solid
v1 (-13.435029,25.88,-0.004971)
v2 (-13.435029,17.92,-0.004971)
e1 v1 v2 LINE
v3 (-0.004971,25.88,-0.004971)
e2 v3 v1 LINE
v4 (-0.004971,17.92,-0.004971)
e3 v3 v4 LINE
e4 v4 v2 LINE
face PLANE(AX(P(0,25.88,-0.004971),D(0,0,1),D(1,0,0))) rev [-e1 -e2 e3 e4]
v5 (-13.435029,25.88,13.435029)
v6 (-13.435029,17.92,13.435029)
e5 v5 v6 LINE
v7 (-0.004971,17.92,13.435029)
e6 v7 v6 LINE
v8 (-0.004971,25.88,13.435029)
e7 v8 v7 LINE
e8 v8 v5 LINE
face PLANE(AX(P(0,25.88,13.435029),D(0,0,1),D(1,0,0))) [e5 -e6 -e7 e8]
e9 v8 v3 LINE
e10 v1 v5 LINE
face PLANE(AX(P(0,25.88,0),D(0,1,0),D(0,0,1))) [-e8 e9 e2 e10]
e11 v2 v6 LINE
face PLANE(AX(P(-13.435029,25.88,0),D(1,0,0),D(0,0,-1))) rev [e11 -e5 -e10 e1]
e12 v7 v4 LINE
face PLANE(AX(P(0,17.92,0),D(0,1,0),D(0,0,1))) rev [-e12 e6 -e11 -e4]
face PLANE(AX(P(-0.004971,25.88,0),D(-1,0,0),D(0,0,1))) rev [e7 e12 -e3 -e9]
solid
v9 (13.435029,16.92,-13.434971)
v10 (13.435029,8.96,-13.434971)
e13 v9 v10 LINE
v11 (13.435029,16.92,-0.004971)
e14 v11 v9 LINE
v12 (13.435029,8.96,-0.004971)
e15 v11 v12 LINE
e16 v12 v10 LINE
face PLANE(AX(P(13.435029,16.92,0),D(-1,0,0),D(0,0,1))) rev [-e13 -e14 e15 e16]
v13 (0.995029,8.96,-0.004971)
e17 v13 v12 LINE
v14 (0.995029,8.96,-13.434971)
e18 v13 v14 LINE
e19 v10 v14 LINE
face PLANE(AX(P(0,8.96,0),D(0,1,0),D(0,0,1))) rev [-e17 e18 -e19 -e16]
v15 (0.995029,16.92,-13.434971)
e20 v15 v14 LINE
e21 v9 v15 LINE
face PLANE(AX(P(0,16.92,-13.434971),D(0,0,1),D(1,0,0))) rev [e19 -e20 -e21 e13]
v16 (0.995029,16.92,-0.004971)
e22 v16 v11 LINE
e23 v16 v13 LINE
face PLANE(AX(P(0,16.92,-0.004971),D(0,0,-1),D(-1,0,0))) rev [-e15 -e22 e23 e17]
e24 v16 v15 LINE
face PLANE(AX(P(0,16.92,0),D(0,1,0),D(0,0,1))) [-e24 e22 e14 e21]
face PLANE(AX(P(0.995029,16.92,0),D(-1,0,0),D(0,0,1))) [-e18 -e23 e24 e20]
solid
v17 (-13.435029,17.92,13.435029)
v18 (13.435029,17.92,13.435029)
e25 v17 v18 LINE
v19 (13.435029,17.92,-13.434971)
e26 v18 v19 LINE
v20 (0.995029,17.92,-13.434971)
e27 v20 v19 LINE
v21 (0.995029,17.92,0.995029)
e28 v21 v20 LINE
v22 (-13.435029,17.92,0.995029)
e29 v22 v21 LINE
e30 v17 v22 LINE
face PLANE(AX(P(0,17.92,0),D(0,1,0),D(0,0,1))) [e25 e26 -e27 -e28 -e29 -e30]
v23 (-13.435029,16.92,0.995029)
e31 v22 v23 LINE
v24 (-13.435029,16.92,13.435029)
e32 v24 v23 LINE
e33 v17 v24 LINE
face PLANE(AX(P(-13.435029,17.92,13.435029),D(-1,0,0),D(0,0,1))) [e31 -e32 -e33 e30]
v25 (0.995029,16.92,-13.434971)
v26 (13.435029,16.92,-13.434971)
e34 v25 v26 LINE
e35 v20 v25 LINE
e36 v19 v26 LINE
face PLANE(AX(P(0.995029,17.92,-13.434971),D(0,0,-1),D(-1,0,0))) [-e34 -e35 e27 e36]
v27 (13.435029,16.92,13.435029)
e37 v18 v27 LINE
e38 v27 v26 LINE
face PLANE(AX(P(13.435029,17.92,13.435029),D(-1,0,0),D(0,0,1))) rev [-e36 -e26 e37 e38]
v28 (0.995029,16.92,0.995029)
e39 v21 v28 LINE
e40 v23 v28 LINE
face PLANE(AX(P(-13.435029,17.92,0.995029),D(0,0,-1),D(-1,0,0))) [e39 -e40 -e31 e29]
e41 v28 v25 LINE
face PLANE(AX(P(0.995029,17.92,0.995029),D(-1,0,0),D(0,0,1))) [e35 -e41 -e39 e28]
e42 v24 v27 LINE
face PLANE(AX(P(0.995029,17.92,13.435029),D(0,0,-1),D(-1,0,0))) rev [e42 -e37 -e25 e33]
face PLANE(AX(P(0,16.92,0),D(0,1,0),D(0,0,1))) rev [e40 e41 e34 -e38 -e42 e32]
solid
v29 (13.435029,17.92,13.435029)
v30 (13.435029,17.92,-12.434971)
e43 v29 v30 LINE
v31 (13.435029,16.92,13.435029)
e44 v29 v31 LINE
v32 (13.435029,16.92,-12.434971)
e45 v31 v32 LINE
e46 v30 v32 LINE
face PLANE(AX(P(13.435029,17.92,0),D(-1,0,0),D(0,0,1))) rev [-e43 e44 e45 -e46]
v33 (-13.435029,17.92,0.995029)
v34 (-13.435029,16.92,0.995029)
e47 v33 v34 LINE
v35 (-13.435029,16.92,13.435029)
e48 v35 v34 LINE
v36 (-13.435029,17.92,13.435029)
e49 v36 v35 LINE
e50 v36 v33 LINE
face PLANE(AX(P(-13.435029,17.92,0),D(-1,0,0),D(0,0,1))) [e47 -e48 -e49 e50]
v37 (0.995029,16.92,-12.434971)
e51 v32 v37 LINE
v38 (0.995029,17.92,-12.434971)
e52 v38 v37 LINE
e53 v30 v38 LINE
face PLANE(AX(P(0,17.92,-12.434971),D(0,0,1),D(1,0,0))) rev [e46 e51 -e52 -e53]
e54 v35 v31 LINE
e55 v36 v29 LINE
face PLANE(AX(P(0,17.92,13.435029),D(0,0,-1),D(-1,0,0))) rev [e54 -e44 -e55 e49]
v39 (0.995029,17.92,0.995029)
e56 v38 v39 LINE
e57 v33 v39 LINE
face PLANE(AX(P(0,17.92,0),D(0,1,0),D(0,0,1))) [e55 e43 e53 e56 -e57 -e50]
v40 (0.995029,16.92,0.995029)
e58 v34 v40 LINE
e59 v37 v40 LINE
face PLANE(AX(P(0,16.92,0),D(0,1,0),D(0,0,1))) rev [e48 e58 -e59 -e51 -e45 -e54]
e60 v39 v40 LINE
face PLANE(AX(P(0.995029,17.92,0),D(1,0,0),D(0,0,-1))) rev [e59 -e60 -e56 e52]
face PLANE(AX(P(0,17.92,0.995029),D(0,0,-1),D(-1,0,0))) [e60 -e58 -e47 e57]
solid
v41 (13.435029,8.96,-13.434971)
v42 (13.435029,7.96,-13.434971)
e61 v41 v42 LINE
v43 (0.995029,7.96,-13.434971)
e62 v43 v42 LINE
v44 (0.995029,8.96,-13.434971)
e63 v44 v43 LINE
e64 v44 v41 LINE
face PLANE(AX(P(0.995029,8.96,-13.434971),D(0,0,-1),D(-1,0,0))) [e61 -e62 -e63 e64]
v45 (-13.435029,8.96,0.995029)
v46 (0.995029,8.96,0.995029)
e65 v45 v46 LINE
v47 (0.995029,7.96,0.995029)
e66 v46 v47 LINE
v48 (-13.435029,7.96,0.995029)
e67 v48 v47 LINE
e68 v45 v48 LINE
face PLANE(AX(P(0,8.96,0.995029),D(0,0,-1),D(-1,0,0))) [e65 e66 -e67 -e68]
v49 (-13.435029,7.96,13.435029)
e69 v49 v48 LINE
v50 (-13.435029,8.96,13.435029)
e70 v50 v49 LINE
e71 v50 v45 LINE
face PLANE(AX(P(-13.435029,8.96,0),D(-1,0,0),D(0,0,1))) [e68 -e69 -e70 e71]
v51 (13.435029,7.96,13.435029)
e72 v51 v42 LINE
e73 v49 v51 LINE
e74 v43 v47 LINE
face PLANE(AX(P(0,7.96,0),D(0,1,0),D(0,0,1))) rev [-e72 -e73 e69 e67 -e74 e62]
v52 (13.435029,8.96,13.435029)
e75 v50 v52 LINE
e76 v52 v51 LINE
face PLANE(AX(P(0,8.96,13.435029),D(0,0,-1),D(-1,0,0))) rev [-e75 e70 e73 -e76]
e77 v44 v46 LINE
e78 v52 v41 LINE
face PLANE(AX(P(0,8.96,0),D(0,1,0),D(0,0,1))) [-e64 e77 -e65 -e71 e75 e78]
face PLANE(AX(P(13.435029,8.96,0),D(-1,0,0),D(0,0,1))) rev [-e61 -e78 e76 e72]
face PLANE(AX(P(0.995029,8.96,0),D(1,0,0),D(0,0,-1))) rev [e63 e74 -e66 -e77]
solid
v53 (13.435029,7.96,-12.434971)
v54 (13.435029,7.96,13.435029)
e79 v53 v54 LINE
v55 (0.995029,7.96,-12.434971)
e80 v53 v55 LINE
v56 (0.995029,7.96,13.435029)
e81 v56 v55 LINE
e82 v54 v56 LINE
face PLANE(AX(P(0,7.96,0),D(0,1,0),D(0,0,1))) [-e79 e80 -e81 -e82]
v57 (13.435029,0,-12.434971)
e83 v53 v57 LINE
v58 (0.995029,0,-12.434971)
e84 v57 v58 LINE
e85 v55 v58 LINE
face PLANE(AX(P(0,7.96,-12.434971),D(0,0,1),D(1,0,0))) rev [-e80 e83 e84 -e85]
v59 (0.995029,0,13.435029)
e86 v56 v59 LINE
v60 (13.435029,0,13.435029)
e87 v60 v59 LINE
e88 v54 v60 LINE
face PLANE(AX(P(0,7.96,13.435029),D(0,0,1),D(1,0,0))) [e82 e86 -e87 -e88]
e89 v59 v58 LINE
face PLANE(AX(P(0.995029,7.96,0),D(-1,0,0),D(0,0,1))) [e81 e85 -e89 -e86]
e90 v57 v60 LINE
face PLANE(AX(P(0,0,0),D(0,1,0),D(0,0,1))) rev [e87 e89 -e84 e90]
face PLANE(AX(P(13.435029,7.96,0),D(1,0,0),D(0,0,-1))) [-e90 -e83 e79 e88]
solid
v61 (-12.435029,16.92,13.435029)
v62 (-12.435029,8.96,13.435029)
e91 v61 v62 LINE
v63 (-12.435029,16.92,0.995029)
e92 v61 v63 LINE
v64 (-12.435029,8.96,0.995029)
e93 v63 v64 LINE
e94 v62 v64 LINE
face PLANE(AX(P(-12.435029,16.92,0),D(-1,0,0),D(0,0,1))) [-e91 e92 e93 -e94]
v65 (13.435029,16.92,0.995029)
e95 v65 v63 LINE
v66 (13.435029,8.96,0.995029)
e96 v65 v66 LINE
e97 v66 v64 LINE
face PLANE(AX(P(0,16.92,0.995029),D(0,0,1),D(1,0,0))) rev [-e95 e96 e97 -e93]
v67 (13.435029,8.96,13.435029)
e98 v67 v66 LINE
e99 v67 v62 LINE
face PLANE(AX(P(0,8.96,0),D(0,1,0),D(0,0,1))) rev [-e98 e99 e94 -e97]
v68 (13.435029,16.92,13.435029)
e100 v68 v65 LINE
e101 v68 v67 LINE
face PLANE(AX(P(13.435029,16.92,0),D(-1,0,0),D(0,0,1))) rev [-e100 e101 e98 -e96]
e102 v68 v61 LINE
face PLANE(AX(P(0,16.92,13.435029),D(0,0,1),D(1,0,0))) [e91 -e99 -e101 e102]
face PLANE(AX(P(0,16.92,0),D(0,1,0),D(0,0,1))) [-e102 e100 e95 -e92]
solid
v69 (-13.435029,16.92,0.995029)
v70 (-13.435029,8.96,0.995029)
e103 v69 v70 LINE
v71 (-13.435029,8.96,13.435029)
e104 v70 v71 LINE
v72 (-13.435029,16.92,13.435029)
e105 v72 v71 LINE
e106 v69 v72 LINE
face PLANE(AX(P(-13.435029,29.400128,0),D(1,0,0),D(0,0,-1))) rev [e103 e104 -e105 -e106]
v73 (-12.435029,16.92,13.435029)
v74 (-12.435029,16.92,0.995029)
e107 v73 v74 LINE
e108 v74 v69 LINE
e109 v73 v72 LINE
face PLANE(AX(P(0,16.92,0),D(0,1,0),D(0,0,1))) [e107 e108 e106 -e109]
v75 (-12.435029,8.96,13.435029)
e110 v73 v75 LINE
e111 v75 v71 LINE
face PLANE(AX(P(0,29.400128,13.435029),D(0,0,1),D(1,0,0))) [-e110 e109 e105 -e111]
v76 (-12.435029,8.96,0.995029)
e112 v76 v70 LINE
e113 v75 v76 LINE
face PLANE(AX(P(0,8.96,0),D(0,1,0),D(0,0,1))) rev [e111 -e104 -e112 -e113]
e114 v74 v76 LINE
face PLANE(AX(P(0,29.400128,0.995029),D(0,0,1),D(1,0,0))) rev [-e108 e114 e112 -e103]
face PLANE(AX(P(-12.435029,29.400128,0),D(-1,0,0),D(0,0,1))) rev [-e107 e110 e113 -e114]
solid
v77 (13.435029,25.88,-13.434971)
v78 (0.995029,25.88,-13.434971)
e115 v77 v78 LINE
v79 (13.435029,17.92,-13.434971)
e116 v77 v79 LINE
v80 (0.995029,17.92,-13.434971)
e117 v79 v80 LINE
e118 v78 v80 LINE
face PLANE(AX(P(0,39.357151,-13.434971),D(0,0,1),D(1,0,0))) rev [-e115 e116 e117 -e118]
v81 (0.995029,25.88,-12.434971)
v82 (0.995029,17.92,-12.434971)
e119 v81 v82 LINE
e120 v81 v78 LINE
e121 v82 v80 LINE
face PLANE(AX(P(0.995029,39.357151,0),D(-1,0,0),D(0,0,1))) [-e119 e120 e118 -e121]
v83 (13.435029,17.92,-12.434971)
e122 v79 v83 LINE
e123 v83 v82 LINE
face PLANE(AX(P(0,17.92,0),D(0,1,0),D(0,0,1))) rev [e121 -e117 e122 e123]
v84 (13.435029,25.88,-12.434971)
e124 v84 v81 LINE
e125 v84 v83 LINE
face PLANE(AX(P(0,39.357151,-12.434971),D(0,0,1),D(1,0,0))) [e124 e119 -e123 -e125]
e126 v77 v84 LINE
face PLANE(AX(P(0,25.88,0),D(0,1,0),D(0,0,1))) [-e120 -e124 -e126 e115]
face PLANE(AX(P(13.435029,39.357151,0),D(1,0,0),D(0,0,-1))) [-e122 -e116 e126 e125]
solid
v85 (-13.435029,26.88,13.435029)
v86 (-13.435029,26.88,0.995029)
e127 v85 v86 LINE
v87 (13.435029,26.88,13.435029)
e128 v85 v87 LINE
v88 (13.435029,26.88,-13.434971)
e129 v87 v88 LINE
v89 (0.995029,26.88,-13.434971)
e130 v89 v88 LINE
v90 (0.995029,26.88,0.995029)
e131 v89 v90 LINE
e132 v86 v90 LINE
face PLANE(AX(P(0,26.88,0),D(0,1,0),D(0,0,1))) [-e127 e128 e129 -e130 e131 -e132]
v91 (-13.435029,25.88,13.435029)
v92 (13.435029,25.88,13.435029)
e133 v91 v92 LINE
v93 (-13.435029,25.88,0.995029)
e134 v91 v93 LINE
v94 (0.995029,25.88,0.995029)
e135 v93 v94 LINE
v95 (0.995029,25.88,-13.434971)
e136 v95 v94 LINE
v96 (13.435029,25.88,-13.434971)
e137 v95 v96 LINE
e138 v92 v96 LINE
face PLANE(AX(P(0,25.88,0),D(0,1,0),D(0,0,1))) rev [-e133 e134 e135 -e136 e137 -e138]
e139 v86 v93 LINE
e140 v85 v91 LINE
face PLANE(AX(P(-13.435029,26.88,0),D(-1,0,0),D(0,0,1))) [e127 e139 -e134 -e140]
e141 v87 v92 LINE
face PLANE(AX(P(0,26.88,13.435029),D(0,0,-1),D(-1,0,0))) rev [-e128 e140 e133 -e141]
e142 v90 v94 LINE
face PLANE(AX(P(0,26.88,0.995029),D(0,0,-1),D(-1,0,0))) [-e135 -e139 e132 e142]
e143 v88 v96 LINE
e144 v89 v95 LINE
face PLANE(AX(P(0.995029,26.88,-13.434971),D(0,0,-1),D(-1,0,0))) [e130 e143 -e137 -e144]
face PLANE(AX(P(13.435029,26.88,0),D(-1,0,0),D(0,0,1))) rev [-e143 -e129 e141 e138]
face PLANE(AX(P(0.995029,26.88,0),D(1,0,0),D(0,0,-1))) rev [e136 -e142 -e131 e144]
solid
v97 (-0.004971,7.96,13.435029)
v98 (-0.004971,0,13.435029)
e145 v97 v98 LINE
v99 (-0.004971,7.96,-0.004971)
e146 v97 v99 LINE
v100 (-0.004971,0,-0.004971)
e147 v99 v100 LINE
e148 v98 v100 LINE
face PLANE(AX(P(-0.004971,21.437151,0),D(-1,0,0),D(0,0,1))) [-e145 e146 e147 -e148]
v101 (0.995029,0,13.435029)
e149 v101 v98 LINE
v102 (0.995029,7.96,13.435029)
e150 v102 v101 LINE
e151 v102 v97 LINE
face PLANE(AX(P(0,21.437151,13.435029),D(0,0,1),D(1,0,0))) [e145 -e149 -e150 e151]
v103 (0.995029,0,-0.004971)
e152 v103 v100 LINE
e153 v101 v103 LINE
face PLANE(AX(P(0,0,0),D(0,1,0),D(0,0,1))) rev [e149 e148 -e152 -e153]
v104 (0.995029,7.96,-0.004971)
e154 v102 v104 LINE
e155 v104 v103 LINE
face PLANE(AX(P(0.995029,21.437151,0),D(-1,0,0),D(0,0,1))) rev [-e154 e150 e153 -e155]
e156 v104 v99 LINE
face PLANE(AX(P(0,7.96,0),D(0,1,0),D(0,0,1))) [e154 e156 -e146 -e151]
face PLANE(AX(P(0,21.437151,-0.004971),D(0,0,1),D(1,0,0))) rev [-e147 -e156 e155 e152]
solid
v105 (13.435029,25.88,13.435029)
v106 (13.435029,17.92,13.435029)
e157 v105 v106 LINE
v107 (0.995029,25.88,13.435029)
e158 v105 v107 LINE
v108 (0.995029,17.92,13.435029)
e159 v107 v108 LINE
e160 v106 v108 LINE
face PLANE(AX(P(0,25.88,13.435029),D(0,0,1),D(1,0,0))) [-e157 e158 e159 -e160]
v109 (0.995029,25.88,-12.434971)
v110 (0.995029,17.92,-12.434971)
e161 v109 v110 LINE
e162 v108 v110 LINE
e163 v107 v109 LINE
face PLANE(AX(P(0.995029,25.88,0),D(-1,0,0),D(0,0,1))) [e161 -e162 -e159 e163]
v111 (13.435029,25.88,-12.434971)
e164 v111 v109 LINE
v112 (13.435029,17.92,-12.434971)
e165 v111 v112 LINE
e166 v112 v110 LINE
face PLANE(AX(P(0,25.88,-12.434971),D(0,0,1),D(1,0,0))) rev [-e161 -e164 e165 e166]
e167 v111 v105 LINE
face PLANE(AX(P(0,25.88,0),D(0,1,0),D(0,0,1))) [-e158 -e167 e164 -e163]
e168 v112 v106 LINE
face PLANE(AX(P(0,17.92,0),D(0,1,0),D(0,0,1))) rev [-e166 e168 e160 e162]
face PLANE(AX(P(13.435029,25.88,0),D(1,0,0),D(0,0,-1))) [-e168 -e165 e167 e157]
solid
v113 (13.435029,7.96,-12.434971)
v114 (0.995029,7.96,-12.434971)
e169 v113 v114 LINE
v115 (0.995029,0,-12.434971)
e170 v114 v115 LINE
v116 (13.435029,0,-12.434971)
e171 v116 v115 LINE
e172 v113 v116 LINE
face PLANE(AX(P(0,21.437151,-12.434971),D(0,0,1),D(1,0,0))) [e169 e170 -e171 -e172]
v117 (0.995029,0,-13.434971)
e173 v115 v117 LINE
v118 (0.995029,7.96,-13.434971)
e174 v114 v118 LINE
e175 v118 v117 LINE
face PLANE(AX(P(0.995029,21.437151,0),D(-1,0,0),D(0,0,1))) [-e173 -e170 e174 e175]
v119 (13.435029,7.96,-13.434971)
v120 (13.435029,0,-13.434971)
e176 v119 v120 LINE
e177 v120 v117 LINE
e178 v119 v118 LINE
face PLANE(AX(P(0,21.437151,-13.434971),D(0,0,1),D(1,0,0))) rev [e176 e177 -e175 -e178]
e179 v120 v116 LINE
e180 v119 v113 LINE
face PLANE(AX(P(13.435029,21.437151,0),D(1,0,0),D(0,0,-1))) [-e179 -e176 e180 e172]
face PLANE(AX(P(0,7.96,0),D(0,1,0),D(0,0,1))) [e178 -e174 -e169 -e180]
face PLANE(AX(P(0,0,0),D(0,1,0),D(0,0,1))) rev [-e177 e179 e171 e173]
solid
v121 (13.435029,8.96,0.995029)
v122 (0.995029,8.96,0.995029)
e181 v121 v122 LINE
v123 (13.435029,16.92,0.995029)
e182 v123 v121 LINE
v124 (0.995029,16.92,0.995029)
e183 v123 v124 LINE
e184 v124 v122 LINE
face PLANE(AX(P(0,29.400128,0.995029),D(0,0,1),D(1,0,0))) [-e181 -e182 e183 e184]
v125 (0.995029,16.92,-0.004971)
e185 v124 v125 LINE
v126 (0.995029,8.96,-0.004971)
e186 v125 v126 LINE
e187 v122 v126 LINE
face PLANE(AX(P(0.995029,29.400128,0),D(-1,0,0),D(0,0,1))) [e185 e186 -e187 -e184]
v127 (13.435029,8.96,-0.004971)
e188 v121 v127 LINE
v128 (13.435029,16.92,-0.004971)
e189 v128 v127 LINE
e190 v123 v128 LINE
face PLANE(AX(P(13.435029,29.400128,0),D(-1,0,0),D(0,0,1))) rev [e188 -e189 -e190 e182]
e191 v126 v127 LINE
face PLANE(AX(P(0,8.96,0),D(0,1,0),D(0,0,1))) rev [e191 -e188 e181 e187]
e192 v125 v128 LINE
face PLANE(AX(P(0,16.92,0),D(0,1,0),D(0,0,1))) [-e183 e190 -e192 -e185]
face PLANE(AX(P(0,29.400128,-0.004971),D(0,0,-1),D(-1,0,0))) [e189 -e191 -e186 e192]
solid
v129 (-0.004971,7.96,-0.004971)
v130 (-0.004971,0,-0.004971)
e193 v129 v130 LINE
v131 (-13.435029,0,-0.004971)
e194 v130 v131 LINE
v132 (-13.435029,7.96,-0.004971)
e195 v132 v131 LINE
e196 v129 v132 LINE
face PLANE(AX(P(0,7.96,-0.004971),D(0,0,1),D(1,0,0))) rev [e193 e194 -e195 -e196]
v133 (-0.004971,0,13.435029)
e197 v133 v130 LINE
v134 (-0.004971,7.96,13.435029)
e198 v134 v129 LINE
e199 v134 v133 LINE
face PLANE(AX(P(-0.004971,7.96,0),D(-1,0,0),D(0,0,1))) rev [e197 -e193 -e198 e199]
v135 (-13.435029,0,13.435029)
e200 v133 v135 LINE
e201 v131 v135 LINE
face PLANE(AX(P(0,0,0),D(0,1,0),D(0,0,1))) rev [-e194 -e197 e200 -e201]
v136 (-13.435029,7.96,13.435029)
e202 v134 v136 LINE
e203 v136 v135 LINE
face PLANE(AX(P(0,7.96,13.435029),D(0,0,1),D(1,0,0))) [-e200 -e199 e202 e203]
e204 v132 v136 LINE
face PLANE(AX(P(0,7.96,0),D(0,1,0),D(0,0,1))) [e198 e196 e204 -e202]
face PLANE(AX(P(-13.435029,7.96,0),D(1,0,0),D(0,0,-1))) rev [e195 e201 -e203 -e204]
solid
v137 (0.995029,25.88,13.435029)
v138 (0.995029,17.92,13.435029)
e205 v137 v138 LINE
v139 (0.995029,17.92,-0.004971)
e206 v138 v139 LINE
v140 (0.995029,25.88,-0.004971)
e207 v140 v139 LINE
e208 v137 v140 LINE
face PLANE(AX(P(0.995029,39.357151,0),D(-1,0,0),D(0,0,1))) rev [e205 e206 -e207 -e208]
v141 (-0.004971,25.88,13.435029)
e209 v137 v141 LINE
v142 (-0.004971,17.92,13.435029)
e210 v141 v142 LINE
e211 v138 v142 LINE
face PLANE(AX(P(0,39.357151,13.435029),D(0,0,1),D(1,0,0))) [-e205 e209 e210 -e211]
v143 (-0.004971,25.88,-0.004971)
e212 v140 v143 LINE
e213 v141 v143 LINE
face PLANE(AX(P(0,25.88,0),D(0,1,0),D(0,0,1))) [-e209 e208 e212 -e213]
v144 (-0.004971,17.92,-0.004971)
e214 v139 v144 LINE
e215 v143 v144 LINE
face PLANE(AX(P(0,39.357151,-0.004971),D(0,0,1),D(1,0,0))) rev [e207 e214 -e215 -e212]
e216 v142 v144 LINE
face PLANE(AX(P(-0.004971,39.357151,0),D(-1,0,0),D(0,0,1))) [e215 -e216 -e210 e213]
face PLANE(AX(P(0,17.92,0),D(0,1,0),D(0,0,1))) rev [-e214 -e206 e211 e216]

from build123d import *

# Parameters (mm, degrees)
EXTRUDE_2_DEPTH               = 7.96
SKETCH_3_W                    = 13.430057686
SKETCH_3_H                    = 13.44
EXTRUDE_2_2_DEPTH             = 7.96
SKETCH_3_3_W                  = 12.44
SKETCH_3_3_H                  = 1.000057686
EXTRUDE_3_DEPTH               = 7.96
SKETCH_3_3_W_2                = 1
SKETCH_3_3_H_2                = 13.44
EXTRUDE_3_2_DEPTH             = 7.96
SKETCH_4_W                    = 12.44
SKETCH_4_H                    = 13.43
EXTRUDE_4_DEPTH               = 7.96
EXTRUDE_4_2_DEPTH             = 7.96
SKETCH_4_4_W                  = 12.44
SKETCH_4_4_H                  = 1
EXTRUDE_5_DEPTH               = 7.96
SKETCH_4_4_W_2                = 1
SKETCH_4_4_H_2                = 12.44
EXTRUDE_5_2_DEPTH             = 7.96
EXTRUDE_8_DEPTH               = 1
PATTERN_START                 = 0.995028843
PATTERN_LINEAR_10_OUTLINE_W   = 26.870057686
PATTERN_LINEAR_10_OUTLINE_H   = 1
PATTERN_LINEAR_10_DEPTH       = 12.44
PATTERN_START_2               = -13.434971157
PATTERN_LINEAR_10_2_OUTLINE_W = 12.44
PATTERN_LINEAR_10_2_OUTLINE_H = 1
PATTERN_LINEAR_10_2_DEPTH     = 14.43
PATTERN_LINEAR_10_3_OUTLINE_W = 26.870057686
PATTERN_LINEAR_10_3_OUTLINE_H = 1
PATTERN_LINEAR_10_3_DEPTH     = 12.44
PATTERN_START_3               = -12.434971157
PATTERN_LINEAR_10_4_OUTLINE_W = 12.44
PATTERN_LINEAR_10_4_OUTLINE_H = 1
PATTERN_LINEAR_10_4_DEPTH     = 13.43
PATTERN_LINEAR_8_COUNT        = 2
PATTERN_LINEAR_8_PITCH        = 17.92


# Read off the part's stored shape, not the designer's step: Линейный массив10
with BuildPart() as part:
    # Эскиз3 → Бобышка-Вытянуть2 (new body)
    with BuildSketch(Plane(origin=(0, 0, 0), x_dir=(1, 0, 0), z_dir=(0, 1, 0))):
        Polygon((13.435028843, 12.434971157), (0.995028843, 12.434971157), (0.995028843, 0.004971157), (0.995028843, -13.435028843), (13.435028843, -13.435028843), align=None)
    extrude(amount=EXTRUDE_2_DEPTH)


with BuildPart() as body_2:
    # Эскиз3 → Extrude 2 2 (new body)
    with BuildSketch(Plane(origin=(0, 0, 0), x_dir=(1, 0, 0), z_dir=(0, 1, 0))):
        with Locations((-6.72, -6.715028843)):
            Rectangle(SKETCH_3_W, SKETCH_3_H)
    extrude(amount=EXTRUDE_2_2_DEPTH)


with BuildPart() as body_3:
    # Эскиз3<3> → Бобышка-Вытянуть3 (new body)
    with BuildSketch(Plane(origin=(0, 0, 0), x_dir=(1, 0, 0), z_dir=(0, 1, 0))):
        with Locations((7.215028843, 12.935)):
            Rectangle(SKETCH_3_3_W, SKETCH_3_3_H)
    extrude(amount=EXTRUDE_3_DEPTH)


with BuildPart() as body_4:
    # Эскиз3<3> → Extrude 3 2 (new body)
    with BuildSketch(Plane(origin=(0, 0, 0), x_dir=(1, 0, 0), z_dir=(0, 1, 0))):
        with Locations((0.495028843, -6.715028843)):
            Rectangle(SKETCH_3_3_W_2, SKETCH_3_3_H_2)
    extrude(amount=EXTRUDE_3_2_DEPTH)


with BuildPart() as body_5:
    # Эскиз4 → Бобышка-Вытянуть4 (new body)
    with BuildSketch(Plane(origin=(0, 8.96, 0), x_dir=(1, 0, 0), z_dir=(0, 1, 0))):
        with Locations((7.215028843, 6.719971157)):
            Rectangle(SKETCH_4_W, SKETCH_4_H)
    extrude(amount=EXTRUDE_4_DEPTH)


with BuildPart() as body_6:
    # Эскиз4 → Extrude 4 2 (new body)
    with BuildSketch(Plane(origin=(0, 8.96, 0), x_dir=(1, 0, 0), z_dir=(0, 1, 0))):
        Polygon((1.143114309, -0.995028843), (0.995028843, -0.995028843), (-12.435028843, -0.995028843), (-12.435028843, -13.435028843), (0.995028843, -13.435028843), (13.435028843, -13.435028843), (13.435028843, -0.995028843), align=None)
    extrude(amount=EXTRUDE_4_2_DEPTH)


with BuildPart() as body_7:
    # Эскиз4<4> → Бобышка-Вытянуть5 (new body)
    with BuildSketch(Plane(origin=(0, 8.96, 0), x_dir=(1, 0, 0), z_dir=(0, 1, 0))):
        with Locations((7.215028843, -0.495028843)):
            Rectangle(SKETCH_4_4_W, SKETCH_4_4_H)
    extrude(amount=EXTRUDE_5_DEPTH)


with BuildPart() as body_8:
    # Эскиз4<4> → Extrude 5 2 (new body)
    with BuildSketch(Plane(origin=(0, 8.96, 0), x_dir=(1, 0, 0), z_dir=(0, 1, 0))):
        with Locations((-12.935028843, -7.215028843)):
            Rectangle(SKETCH_4_4_W_2, SKETCH_4_4_H_2)
    extrude(amount=EXTRUDE_5_2_DEPTH)


with BuildPart() as body_9:
    # Эскиз5 → Бобышка-Вытянуть8 (new body)
    with BuildSketch(Plane(origin=(0, 7.96, 0), x_dir=(1, 0, 0), z_dir=(0, 1, 0))):
        Polygon((-13.435028843, -13.435028843), (0.995028843, -13.435028843), (13.435028843, -13.435028843), (13.435028843, 13.434971157), (0.995028843, 13.434971157), (0.995028843, -0.995028843), (-13.435028843, -0.995028843), align=None)
    extrude(amount=EXTRUDE_8_DEPTH)


with BuildPart() as body_10:
    # Линейный массив10 outline → Линейный массив10 (new body)
    with BuildSketch(Plane.XY.offset(PATTERN_START)):
        with Locations((0, 17.42)):
            Rectangle(PATTERN_LINEAR_10_OUTLINE_W, PATTERN_LINEAR_10_OUTLINE_H)
    extrude(amount=PATTERN_LINEAR_10_DEPTH)

    # Pattern Linear 10 2 outline → Pattern Linear 10 2 (add)
    with BuildSketch(Plane.XY.offset(PATTERN_START_2)):
        with Locations((7.215028843, 17.42)):
            Rectangle(PATTERN_LINEAR_10_2_OUTLINE_W, PATTERN_LINEAR_10_2_OUTLINE_H)
    extrude(amount=PATTERN_LINEAR_10_2_DEPTH)


with BuildPart() as body_11:
    # Pattern Linear 10 3 outline → Pattern Linear 10 3 (new body)
    with BuildSketch(Plane.XY.offset(PATTERN_START)):
        with Locations((0, 17.42)):
            Rectangle(PATTERN_LINEAR_10_3_OUTLINE_W, PATTERN_LINEAR_10_3_OUTLINE_H)
    extrude(amount=PATTERN_LINEAR_10_3_DEPTH)

    # Pattern Linear 10 4 outline → Pattern Linear 10 4 (add)
    with BuildSketch(Plane.XY.offset(PATTERN_START_3)):
        with Locations((7.215028843, 17.42)):
            Rectangle(PATTERN_LINEAR_10_4_OUTLINE_W, PATTERN_LINEAR_10_4_OUTLINE_H)
    extrude(amount=PATTERN_LINEAR_10_4_DEPTH)


with BuildPart() as pattern_linear_8_1:
    # Линейный массив8: pattern copy
    add(body_3.part.moved(Location(Vector(0, 1, 0) * (1 * PATTERN_LINEAR_8_PITCH))))


with BuildPart() as pattern_linear_8_2:
    # Линейный массив8: pattern copy
    add(body_2.part.moved(Location(Vector(0, 1, 0) * (1 * PATTERN_LINEAR_8_PITCH))))


with BuildPart() as pattern_linear_8_3:
    # Линейный массив8: pattern copy
    add(body_9.part.moved(Location(Vector(0, 1, 0) * (1 * PATTERN_LINEAR_8_PITCH))))


with BuildPart() as pattern_linear_8_4:
    # Линейный массив8: pattern copy
    add(body_4.part.moved(Location(Vector(0, 1, 0) * (1 * PATTERN_LINEAR_8_PITCH))))


with BuildPart() as pattern_linear_8_5:
    # Линейный массив8: pattern copy
    add(part.part.moved(Location(Vector(0, 1, 0) * (1 * PATTERN_LINEAR_8_PITCH))))


solid = Compound([part.part, body_2.part, body_3.part, body_4.part, body_5.part, body_6.part, body_7.part, body_8.part, body_9.part, body_10.part, body_11.part, pattern_linear_8_1.part, pattern_linear_8_2.part, pattern_linear_8_3.part, pattern_linear_8_4.part, pattern_linear_8_5.part])
